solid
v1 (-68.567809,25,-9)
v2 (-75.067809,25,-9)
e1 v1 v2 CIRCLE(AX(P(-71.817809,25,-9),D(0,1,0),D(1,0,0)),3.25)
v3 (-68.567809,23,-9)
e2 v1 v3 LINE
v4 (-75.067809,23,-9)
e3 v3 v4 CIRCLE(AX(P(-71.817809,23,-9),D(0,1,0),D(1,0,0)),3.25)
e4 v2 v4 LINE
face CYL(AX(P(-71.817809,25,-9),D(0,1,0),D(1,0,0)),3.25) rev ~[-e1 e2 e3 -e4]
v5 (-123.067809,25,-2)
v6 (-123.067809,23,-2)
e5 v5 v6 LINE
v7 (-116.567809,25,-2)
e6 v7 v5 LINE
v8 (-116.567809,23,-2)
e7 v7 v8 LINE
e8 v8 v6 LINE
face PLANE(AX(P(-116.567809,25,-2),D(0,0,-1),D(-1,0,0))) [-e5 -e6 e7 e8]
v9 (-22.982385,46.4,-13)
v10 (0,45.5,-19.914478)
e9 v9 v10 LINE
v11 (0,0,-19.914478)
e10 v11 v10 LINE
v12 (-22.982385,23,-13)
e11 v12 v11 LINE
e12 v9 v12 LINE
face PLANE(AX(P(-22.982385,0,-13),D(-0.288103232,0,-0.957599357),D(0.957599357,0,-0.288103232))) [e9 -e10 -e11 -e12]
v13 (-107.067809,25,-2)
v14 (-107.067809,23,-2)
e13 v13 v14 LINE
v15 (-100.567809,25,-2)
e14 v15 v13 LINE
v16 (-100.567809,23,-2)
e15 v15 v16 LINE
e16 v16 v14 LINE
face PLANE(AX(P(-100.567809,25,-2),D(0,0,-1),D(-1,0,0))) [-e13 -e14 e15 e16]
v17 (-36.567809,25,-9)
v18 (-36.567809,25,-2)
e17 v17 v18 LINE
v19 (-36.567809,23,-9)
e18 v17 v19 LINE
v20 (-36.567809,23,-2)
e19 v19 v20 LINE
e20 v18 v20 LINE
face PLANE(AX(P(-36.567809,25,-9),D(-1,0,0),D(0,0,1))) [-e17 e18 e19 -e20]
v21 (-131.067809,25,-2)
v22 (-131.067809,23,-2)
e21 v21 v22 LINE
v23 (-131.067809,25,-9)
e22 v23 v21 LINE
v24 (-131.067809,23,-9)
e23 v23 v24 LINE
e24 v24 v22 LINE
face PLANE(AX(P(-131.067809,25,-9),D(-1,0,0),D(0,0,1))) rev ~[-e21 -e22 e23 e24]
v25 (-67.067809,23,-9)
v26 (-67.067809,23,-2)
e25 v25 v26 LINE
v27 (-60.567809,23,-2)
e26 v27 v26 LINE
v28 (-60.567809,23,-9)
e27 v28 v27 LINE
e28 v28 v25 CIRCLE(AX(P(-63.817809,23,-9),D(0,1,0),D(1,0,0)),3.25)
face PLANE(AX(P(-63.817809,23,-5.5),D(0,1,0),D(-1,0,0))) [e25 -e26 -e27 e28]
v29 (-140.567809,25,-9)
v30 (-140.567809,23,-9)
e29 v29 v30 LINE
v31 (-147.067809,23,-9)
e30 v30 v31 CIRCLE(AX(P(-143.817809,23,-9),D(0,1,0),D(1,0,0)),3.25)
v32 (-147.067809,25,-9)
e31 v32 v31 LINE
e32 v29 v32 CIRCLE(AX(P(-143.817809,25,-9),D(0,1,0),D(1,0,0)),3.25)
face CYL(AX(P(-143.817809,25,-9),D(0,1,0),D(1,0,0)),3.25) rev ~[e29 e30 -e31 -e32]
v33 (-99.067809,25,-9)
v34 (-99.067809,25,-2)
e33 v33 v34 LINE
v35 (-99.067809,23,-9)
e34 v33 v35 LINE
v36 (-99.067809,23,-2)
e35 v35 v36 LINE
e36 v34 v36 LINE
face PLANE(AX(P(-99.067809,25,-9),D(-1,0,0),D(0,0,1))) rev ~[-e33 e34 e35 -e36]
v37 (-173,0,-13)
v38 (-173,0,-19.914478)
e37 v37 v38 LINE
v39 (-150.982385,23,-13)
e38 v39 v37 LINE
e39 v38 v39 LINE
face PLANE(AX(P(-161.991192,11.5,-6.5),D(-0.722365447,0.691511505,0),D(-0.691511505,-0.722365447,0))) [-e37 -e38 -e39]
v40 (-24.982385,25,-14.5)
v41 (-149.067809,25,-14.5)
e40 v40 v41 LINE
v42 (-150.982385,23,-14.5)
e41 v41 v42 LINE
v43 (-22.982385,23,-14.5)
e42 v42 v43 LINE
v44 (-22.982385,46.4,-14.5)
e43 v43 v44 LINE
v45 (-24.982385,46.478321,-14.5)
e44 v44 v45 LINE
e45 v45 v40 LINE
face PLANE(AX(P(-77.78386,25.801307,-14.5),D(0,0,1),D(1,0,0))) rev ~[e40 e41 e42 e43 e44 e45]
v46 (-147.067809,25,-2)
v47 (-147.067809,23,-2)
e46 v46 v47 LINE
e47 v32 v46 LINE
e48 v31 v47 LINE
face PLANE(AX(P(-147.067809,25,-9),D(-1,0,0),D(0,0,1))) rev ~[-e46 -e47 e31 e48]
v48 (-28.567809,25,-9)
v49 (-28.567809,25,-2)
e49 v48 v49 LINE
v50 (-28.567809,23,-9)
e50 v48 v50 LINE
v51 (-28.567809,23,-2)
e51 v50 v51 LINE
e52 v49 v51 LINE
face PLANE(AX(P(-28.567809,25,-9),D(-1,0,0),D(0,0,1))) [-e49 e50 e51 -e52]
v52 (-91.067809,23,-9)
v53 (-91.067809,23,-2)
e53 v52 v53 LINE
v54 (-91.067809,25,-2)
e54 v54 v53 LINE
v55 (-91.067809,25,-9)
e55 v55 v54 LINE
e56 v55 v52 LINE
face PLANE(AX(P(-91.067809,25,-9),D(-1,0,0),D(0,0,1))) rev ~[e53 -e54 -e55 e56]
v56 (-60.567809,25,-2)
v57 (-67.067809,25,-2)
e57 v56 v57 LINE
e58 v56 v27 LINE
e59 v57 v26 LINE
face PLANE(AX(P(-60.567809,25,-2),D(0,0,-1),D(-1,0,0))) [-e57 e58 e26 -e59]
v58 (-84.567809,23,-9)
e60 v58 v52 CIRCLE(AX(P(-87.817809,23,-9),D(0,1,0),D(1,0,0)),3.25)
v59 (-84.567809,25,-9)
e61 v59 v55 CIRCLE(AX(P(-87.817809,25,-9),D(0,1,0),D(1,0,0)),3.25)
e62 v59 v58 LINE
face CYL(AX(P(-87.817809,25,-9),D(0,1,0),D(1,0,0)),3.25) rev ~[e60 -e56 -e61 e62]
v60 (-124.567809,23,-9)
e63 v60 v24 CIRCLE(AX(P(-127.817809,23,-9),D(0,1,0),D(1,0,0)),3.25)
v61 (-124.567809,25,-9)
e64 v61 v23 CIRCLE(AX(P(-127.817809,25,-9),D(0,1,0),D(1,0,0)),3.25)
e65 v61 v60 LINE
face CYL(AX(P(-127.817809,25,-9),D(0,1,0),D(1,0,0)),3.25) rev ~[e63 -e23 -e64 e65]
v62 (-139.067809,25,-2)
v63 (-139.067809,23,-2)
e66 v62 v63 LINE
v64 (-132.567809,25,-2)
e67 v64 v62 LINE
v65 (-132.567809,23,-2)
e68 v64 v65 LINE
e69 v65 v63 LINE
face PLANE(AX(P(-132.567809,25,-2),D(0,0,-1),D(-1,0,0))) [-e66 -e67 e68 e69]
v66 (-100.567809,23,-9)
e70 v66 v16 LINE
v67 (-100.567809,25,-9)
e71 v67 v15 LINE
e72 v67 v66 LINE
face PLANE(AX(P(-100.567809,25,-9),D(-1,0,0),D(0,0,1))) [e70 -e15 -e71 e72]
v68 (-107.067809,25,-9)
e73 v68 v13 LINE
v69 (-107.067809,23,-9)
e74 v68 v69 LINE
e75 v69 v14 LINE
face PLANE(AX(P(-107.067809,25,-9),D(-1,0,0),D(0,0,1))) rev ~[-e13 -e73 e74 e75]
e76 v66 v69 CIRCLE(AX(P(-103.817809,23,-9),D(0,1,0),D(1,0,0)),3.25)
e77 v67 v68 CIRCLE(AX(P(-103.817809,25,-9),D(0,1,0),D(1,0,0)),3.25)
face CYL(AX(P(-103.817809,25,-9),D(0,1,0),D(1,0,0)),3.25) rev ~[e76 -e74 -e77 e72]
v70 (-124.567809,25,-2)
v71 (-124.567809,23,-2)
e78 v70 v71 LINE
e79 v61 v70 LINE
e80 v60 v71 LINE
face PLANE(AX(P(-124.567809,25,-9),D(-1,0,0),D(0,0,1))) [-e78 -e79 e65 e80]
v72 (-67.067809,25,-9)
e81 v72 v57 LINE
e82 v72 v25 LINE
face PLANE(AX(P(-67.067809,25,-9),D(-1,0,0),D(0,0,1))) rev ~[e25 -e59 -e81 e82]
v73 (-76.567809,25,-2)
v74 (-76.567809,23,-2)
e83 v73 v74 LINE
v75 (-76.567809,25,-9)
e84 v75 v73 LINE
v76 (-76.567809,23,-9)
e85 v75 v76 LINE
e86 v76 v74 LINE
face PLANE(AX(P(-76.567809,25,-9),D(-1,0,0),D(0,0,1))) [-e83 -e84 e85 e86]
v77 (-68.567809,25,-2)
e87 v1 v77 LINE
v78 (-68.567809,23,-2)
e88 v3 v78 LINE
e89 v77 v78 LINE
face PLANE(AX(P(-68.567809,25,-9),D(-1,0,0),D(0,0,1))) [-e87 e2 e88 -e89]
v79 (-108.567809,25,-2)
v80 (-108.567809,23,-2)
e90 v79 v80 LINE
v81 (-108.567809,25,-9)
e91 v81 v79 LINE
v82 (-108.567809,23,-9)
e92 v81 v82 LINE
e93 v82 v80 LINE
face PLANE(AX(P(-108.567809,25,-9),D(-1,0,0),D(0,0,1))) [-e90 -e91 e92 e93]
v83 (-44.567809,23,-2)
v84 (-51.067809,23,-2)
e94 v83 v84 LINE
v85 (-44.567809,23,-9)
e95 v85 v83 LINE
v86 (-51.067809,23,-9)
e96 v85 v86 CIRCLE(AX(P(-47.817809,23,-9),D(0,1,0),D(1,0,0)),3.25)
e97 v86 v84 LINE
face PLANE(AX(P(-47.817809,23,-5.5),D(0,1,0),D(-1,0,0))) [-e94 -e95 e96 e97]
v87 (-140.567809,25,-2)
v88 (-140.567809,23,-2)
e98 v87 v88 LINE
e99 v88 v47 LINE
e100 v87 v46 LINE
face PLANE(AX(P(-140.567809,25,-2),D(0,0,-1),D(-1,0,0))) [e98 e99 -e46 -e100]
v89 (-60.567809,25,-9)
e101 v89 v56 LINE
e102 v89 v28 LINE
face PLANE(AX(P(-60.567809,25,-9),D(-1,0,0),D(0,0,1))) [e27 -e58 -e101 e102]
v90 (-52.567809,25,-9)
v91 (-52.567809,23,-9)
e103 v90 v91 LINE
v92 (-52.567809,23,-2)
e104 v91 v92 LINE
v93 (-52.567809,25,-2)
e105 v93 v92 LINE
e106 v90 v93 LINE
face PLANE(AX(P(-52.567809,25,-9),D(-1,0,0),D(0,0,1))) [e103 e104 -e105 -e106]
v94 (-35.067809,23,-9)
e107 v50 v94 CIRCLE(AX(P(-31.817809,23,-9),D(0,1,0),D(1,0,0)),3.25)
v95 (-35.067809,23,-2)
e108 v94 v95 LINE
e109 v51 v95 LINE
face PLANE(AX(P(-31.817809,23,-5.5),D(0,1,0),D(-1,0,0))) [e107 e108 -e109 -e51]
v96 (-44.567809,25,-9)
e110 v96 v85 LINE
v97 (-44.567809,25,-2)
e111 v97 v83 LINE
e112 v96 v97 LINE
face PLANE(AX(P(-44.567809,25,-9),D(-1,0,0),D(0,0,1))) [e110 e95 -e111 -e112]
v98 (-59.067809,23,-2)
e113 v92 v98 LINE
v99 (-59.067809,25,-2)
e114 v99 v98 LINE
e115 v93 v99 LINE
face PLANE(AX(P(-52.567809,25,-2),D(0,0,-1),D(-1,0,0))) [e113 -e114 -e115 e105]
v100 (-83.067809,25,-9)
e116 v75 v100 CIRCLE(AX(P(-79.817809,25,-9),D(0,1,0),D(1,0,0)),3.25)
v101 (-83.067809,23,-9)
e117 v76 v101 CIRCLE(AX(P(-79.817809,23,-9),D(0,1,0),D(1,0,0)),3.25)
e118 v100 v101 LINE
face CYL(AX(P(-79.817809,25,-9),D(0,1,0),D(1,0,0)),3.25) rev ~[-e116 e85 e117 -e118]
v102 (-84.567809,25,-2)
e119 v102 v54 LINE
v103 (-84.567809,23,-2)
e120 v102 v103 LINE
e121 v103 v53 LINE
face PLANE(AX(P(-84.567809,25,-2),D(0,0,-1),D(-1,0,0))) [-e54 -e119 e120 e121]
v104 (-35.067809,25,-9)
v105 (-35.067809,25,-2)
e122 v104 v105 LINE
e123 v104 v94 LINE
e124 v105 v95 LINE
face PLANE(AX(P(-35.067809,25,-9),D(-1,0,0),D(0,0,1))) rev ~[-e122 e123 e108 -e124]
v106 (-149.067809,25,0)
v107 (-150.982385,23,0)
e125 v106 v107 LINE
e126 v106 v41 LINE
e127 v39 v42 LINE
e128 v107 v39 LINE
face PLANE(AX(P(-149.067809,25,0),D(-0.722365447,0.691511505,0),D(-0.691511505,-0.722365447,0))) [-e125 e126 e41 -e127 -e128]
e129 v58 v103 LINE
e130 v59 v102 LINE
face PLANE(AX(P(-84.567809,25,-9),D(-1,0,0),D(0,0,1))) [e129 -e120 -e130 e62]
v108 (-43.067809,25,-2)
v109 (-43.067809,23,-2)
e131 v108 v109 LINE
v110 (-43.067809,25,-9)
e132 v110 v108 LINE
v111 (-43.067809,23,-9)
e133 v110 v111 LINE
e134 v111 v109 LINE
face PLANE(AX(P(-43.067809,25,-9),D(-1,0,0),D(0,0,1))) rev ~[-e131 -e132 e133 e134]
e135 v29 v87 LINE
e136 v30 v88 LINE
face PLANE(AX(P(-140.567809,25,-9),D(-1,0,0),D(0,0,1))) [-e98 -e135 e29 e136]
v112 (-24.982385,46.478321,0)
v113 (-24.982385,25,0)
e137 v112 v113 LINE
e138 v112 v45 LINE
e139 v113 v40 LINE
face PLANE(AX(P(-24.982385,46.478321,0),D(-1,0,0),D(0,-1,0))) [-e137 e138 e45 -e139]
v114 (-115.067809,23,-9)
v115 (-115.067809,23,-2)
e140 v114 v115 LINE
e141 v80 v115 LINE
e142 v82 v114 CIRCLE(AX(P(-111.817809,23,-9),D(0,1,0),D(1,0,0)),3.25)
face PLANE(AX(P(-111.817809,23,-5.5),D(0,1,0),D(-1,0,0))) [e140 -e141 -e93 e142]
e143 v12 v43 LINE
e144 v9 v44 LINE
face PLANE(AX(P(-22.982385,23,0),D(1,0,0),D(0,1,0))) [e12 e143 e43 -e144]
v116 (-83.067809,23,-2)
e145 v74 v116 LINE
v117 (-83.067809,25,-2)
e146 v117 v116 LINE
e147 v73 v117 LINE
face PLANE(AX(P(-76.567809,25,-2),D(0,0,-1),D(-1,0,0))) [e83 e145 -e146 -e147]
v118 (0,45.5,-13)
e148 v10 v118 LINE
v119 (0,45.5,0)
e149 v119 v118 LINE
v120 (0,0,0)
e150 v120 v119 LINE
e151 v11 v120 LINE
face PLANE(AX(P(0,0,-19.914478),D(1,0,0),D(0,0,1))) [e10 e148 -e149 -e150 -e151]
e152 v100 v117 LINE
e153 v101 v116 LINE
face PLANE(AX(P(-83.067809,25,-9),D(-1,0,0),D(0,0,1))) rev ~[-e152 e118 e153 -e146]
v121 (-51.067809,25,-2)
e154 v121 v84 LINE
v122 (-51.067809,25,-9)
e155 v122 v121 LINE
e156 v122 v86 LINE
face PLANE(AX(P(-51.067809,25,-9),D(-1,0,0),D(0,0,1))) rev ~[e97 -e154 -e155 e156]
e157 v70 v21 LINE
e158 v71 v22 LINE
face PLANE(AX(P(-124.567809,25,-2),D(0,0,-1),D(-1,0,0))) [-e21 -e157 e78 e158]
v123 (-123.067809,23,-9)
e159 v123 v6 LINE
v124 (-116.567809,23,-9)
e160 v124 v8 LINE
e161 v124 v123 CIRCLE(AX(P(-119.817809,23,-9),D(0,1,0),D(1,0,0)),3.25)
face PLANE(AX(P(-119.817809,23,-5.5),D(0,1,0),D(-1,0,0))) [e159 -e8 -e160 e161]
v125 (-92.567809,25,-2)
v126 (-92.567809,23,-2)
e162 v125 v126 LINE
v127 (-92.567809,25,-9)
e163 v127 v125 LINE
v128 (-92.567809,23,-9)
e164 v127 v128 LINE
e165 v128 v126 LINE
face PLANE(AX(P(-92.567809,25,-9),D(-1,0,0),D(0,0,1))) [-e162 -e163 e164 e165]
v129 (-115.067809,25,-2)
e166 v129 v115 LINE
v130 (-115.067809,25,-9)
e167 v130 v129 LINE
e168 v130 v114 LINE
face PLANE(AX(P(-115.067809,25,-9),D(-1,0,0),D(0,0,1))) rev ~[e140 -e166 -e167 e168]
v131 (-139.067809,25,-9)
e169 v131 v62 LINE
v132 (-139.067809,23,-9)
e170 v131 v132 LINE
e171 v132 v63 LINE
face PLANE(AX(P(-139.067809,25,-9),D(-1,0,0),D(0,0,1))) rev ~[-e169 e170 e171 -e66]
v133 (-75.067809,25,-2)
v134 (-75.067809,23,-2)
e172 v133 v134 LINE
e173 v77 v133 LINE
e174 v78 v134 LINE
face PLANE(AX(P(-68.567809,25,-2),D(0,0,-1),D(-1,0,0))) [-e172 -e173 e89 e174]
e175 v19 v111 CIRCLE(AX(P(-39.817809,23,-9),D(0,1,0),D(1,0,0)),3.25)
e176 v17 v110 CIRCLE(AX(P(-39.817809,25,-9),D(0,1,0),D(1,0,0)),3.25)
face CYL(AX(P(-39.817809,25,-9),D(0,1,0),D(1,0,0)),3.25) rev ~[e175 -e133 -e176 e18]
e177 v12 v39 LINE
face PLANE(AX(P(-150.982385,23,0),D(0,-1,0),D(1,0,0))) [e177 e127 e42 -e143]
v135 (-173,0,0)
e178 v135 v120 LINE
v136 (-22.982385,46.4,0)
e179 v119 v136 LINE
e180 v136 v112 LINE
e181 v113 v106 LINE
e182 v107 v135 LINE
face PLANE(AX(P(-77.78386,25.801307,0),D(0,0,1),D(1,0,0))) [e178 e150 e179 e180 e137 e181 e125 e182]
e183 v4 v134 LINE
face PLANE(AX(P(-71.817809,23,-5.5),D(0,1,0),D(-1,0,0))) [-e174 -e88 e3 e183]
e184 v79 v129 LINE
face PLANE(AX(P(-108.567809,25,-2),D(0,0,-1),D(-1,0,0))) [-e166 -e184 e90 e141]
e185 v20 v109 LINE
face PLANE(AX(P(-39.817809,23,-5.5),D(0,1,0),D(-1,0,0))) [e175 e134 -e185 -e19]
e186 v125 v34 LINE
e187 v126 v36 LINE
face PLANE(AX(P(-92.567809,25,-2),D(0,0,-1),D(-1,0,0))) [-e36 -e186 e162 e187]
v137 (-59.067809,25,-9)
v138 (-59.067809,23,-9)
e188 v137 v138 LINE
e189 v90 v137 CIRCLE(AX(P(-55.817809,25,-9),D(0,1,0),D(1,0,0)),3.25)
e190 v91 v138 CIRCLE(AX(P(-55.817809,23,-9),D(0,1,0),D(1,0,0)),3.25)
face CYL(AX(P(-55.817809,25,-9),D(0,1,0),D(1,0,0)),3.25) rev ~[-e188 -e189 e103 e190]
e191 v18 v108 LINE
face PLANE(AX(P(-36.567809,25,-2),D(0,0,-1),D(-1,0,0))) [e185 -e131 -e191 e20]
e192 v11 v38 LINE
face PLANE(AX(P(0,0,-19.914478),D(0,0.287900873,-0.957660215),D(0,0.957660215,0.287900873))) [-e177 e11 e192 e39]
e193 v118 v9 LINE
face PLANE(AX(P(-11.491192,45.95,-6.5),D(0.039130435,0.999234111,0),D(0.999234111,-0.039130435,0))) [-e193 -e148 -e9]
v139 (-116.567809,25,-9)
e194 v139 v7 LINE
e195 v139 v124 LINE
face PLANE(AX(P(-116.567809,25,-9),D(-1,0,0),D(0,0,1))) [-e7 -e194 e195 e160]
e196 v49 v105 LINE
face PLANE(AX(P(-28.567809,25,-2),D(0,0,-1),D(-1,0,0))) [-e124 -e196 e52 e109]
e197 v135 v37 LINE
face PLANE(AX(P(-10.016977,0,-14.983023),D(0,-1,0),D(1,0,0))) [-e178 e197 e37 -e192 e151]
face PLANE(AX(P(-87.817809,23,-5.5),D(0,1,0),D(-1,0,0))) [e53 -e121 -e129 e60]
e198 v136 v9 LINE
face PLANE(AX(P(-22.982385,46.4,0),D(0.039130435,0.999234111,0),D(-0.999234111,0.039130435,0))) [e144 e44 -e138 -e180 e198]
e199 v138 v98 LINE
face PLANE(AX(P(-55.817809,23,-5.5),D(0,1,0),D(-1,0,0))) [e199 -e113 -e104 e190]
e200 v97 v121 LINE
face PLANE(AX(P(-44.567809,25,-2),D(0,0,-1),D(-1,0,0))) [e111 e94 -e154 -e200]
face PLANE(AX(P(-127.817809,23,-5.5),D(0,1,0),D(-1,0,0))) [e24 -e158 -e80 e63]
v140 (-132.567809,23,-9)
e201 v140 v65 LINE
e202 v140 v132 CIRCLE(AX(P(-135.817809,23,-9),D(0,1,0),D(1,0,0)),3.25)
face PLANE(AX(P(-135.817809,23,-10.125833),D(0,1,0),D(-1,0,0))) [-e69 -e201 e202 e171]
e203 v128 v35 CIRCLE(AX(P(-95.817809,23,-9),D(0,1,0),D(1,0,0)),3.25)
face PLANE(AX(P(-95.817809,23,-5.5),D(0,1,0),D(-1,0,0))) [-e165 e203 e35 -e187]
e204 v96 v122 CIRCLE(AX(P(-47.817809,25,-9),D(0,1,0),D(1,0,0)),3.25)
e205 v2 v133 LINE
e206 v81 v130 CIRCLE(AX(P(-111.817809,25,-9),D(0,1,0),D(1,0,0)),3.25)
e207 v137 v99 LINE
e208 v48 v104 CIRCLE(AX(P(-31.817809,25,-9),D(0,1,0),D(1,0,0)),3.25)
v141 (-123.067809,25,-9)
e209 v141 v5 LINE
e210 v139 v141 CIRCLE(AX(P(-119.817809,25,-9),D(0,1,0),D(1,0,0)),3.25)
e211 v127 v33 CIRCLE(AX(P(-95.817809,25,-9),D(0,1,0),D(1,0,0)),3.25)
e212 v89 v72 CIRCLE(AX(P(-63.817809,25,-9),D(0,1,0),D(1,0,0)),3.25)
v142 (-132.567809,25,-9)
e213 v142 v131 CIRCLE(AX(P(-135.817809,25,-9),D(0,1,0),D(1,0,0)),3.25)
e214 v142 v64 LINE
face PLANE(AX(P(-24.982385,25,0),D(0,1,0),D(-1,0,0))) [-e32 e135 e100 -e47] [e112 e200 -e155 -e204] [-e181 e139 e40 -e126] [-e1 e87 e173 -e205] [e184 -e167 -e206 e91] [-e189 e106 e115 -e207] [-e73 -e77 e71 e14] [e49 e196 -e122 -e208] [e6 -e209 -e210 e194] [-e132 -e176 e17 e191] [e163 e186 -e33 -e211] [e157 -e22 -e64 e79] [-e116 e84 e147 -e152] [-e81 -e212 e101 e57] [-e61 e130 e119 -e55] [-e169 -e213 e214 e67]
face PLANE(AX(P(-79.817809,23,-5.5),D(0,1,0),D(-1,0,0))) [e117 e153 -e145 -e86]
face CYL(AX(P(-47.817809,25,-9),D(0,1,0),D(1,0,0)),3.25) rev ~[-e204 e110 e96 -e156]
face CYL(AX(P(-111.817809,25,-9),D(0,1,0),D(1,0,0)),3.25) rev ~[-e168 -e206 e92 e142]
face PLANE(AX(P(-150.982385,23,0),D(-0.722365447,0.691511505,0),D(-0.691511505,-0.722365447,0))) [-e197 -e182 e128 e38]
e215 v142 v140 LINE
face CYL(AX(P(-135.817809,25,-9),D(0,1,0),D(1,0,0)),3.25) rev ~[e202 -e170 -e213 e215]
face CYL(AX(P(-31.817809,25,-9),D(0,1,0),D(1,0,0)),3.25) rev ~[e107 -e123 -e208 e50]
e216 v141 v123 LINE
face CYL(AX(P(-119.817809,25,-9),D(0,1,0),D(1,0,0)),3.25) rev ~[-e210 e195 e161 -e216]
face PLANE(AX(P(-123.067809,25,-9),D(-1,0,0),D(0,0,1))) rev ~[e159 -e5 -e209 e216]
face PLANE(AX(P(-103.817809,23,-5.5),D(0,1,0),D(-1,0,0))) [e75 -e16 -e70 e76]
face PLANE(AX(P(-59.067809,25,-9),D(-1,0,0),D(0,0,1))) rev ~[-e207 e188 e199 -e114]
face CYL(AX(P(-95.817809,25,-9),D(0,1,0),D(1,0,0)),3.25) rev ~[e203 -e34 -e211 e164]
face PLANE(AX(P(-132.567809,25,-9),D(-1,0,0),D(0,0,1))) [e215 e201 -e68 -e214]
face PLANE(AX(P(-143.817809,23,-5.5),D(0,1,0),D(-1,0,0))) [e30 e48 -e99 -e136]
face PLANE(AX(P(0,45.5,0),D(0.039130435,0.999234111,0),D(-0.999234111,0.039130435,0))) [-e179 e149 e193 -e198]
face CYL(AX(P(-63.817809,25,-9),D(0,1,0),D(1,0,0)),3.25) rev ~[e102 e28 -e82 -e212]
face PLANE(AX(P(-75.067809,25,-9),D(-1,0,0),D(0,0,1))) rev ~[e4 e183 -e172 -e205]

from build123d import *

# Parameters (mm, degrees)
F1_DEPTH = 13
F3_REACH = 70.401
F5_REACH = 197.0178690716
F7_DEPTH = 14.5
F8_W     = 6.5
F8_H     = 7
F9_DEPTH = 2


with BuildPart() as f1:
    # F0 (on Top) → F1 (new body)
    with BuildSketch(Plane.XY):
        Polygon((-43.3400757611, 0), (0, 0), (0, 45.5), (-22.9823845586, 46.4), (-22.9823845586, 23), (-150.9823845586, 23), (-173, 0), align=None)
    extrude(amount=-F1_DEPTH)

    f3_end = Plane(origin=(-11.4911922793, 45.95, -6.5), x_dir=(0.9992341112, -0.0391304348, 0), z_dir=(0.0391304348, 0.9992341112, 0))
    # F2 (on face) → F3 (join, up to a plane its end follows)
    with BuildSketch(Plane.XZ):
        Polygon((-20.9823845586, -13), (-22.9823845586, -13), (0, -19.9144775652), (0, -13), align=None)
    f3_long = extrude(amount=-F3_REACH, mode=Mode.PRIVATE)
    add(split(f3_long, bisect_by=f3_end, keep=Keep.BOTTOM, mode=Mode.PRIVATE))

    f5_end = Plane(origin=(-161.9911922793, 11.5, -6.5), x_dir=(-0.6915115049, -0.7223654467, 0), z_dir=(-0.7223654467, 0.6915115049, 0))
    # F4 (on face) → F5 (join, up to a plane its end follows)
    with BuildSketch(Plane.YZ):
        Polygon((23, -13), (0, -13), (0, -19.9144775652), align=None)
    f5_long = extrude(amount=-F5_REACH, mode=Mode.PRIVATE)
    add(split(f5_long, bisect_by=f5_end, keep=Keep.BOTTOM, mode=Mode.PRIVATE))

    # F6 (on face) → F7 (join)
    with BuildSketch(Plane.XY):
        Polygon((-149.0678093028, 25), (-150.9823845586, 23), (-22.9823845586, 23), (-22.9823845586, 46.4), (-24.9823845586, 46.4783208546), (-24.9823845586, 25), align=None)
    extrude(amount=-F7_DEPTH)

    # F8 (on face) → F9 (cut)
    with BuildSketch(Plane(origin=(0, 25, 0), x_dir=(-1, 0, 0), z_dir=(0, 1, 0))):
        with Locations((143.8178093028, -5.5)):
            Rectangle(F8_W, F8_H)
        with BuildLine():
            ThreePointArc((140.5678093028, -9), (143.8178093028, -12.25), (147.0678093028, -9))
            Line((147.0678093028, -9), (140.5678093028, -9))
        make_face()
        with BuildLine():
            Line((139.0678093028, -9), (132.5678093028, -9))
            ThreePointArc((132.5678093028, -9), (135.8178093028, -12.25), (139.0678093028, -9))
        make_face()
        with Locations((135.8178093028, -5.5)):
            Rectangle(F8_W, F8_H)
        with Locations((127.8178093028, -5.5)):
            Rectangle(F8_W, F8_H)
        with Locations((119.8178093028, -5.5)):
            Rectangle(F8_W, F8_H)
        with Locations((111.8178093028, -5.5)):
            Rectangle(F8_W, F8_H)
        with Locations((103.8178093028, -5.5)):
            Rectangle(F8_W, F8_H)
        with Locations((95.8178093028, -5.5)):
            Rectangle(F8_W, F8_H)
        with Locations((87.8178093028, -5.5)):
            Rectangle(F8_W, F8_H)
        with Locations((79.8178093028, -5.5)):
            Rectangle(F8_W, F8_H)
        with Locations((71.8178093028, -5.5)):
            Rectangle(F8_W, F8_H)
        with Locations((63.8178093028, -5.5)):
            Rectangle(F8_W, F8_H)
        with Locations((55.8178093028, -5.5)):
            Rectangle(F8_W, F8_H)
        with Locations((47.8178093028, -5.5)):
            Rectangle(F8_W, F8_H)
        with Locations((39.8178093028, -5.5)):
            Rectangle(F8_W, F8_H)
        with Locations((31.8178093028, -5.5)):
            Rectangle(F8_W, F8_H)
        with BuildLine():
            Line((35.0678093028, -9), (28.5678093028, -9))
            ThreePointArc((28.5678093028, -9), (31.8178093028, -12.25), (35.0678093028, -9))
        make_face()
        with BuildLine():
            Line((43.0678093028, -9), (36.5678093028, -9))
            ThreePointArc((36.5678093028, -9), (39.8178093028, -12.25), (43.0678093028, -9))
        make_face()
        with BuildLine():
            Line((51.0678093028, -9), (44.5678093028, -9))
            ThreePointArc((44.5678093028, -9), (47.8178093028, -12.25), (51.0678093028, -9))
        make_face()
        with BuildLine():
            Line((59.0678093028, -9), (52.5678093028, -9))
            ThreePointArc((52.5678093028, -9), (55.8178093028, -12.25), (59.0678093028, -9))
        make_face()
        with BuildLine():
            Line((67.0678093028, -9), (60.5678093028, -9))
            ThreePointArc((60.5678093028, -9), (63.8178093028, -12.25), (67.0678093028, -9))
        make_face()
        with BuildLine():
            Line((75.0678093028, -9), (68.5678093028, -9))
            ThreePointArc((68.5678093028, -9), (71.8178093028, -12.25), (75.0678093028, -9))
        make_face()
        with BuildLine():
            Line((83.0678093028, -9), (76.5678093028, -9))
            ThreePointArc((76.5678093028, -9), (79.8178093028, -12.25), (83.0678093028, -9))
        make_face()
        with BuildLine():
            Line((91.0678093028, -9), (84.5678093028, -9))
            ThreePointArc((84.5678093028, -9), (87.8178093028, -12.25), (91.0678093028, -9))
        make_face()
        with BuildLine():
            Line((99.0678093028, -9), (92.5678093028, -9))
            ThreePointArc((92.5678093028, -9), (95.8178093028, -12.25), (99.0678093028, -9))
        make_face()
        with BuildLine():
            Line((107.0678093028, -9), (100.5678093028, -9))
            ThreePointArc((100.5678093028, -9), (103.8178093028, -12.25), (107.0678093028, -9))
        make_face()
        with BuildLine():
            Line((115.0678093028, -9), (108.5678093028, -9))
            ThreePointArc((108.5678093028, -9), (111.8178093028, -12.25), (115.0678093028, -9))
        make_face()
        with BuildLine():
            Line((123.0678093028, -9), (116.5678093028, -9))
            ThreePointArc((116.5678093028, -9), (119.8178093028, -12.25), (123.0678093028, -9))
        make_face()
        with BuildLine():
            Line((131.0678093028, -9), (124.5678093028, -9))
            ThreePointArc((124.5678093028, -9), (127.8178093028, -12.25), (131.0678093028, -9))
        make_face()
    extrude(amount=-F9_DEPTH, mode=Mode.SUBTRACT)


solid = f1.part
